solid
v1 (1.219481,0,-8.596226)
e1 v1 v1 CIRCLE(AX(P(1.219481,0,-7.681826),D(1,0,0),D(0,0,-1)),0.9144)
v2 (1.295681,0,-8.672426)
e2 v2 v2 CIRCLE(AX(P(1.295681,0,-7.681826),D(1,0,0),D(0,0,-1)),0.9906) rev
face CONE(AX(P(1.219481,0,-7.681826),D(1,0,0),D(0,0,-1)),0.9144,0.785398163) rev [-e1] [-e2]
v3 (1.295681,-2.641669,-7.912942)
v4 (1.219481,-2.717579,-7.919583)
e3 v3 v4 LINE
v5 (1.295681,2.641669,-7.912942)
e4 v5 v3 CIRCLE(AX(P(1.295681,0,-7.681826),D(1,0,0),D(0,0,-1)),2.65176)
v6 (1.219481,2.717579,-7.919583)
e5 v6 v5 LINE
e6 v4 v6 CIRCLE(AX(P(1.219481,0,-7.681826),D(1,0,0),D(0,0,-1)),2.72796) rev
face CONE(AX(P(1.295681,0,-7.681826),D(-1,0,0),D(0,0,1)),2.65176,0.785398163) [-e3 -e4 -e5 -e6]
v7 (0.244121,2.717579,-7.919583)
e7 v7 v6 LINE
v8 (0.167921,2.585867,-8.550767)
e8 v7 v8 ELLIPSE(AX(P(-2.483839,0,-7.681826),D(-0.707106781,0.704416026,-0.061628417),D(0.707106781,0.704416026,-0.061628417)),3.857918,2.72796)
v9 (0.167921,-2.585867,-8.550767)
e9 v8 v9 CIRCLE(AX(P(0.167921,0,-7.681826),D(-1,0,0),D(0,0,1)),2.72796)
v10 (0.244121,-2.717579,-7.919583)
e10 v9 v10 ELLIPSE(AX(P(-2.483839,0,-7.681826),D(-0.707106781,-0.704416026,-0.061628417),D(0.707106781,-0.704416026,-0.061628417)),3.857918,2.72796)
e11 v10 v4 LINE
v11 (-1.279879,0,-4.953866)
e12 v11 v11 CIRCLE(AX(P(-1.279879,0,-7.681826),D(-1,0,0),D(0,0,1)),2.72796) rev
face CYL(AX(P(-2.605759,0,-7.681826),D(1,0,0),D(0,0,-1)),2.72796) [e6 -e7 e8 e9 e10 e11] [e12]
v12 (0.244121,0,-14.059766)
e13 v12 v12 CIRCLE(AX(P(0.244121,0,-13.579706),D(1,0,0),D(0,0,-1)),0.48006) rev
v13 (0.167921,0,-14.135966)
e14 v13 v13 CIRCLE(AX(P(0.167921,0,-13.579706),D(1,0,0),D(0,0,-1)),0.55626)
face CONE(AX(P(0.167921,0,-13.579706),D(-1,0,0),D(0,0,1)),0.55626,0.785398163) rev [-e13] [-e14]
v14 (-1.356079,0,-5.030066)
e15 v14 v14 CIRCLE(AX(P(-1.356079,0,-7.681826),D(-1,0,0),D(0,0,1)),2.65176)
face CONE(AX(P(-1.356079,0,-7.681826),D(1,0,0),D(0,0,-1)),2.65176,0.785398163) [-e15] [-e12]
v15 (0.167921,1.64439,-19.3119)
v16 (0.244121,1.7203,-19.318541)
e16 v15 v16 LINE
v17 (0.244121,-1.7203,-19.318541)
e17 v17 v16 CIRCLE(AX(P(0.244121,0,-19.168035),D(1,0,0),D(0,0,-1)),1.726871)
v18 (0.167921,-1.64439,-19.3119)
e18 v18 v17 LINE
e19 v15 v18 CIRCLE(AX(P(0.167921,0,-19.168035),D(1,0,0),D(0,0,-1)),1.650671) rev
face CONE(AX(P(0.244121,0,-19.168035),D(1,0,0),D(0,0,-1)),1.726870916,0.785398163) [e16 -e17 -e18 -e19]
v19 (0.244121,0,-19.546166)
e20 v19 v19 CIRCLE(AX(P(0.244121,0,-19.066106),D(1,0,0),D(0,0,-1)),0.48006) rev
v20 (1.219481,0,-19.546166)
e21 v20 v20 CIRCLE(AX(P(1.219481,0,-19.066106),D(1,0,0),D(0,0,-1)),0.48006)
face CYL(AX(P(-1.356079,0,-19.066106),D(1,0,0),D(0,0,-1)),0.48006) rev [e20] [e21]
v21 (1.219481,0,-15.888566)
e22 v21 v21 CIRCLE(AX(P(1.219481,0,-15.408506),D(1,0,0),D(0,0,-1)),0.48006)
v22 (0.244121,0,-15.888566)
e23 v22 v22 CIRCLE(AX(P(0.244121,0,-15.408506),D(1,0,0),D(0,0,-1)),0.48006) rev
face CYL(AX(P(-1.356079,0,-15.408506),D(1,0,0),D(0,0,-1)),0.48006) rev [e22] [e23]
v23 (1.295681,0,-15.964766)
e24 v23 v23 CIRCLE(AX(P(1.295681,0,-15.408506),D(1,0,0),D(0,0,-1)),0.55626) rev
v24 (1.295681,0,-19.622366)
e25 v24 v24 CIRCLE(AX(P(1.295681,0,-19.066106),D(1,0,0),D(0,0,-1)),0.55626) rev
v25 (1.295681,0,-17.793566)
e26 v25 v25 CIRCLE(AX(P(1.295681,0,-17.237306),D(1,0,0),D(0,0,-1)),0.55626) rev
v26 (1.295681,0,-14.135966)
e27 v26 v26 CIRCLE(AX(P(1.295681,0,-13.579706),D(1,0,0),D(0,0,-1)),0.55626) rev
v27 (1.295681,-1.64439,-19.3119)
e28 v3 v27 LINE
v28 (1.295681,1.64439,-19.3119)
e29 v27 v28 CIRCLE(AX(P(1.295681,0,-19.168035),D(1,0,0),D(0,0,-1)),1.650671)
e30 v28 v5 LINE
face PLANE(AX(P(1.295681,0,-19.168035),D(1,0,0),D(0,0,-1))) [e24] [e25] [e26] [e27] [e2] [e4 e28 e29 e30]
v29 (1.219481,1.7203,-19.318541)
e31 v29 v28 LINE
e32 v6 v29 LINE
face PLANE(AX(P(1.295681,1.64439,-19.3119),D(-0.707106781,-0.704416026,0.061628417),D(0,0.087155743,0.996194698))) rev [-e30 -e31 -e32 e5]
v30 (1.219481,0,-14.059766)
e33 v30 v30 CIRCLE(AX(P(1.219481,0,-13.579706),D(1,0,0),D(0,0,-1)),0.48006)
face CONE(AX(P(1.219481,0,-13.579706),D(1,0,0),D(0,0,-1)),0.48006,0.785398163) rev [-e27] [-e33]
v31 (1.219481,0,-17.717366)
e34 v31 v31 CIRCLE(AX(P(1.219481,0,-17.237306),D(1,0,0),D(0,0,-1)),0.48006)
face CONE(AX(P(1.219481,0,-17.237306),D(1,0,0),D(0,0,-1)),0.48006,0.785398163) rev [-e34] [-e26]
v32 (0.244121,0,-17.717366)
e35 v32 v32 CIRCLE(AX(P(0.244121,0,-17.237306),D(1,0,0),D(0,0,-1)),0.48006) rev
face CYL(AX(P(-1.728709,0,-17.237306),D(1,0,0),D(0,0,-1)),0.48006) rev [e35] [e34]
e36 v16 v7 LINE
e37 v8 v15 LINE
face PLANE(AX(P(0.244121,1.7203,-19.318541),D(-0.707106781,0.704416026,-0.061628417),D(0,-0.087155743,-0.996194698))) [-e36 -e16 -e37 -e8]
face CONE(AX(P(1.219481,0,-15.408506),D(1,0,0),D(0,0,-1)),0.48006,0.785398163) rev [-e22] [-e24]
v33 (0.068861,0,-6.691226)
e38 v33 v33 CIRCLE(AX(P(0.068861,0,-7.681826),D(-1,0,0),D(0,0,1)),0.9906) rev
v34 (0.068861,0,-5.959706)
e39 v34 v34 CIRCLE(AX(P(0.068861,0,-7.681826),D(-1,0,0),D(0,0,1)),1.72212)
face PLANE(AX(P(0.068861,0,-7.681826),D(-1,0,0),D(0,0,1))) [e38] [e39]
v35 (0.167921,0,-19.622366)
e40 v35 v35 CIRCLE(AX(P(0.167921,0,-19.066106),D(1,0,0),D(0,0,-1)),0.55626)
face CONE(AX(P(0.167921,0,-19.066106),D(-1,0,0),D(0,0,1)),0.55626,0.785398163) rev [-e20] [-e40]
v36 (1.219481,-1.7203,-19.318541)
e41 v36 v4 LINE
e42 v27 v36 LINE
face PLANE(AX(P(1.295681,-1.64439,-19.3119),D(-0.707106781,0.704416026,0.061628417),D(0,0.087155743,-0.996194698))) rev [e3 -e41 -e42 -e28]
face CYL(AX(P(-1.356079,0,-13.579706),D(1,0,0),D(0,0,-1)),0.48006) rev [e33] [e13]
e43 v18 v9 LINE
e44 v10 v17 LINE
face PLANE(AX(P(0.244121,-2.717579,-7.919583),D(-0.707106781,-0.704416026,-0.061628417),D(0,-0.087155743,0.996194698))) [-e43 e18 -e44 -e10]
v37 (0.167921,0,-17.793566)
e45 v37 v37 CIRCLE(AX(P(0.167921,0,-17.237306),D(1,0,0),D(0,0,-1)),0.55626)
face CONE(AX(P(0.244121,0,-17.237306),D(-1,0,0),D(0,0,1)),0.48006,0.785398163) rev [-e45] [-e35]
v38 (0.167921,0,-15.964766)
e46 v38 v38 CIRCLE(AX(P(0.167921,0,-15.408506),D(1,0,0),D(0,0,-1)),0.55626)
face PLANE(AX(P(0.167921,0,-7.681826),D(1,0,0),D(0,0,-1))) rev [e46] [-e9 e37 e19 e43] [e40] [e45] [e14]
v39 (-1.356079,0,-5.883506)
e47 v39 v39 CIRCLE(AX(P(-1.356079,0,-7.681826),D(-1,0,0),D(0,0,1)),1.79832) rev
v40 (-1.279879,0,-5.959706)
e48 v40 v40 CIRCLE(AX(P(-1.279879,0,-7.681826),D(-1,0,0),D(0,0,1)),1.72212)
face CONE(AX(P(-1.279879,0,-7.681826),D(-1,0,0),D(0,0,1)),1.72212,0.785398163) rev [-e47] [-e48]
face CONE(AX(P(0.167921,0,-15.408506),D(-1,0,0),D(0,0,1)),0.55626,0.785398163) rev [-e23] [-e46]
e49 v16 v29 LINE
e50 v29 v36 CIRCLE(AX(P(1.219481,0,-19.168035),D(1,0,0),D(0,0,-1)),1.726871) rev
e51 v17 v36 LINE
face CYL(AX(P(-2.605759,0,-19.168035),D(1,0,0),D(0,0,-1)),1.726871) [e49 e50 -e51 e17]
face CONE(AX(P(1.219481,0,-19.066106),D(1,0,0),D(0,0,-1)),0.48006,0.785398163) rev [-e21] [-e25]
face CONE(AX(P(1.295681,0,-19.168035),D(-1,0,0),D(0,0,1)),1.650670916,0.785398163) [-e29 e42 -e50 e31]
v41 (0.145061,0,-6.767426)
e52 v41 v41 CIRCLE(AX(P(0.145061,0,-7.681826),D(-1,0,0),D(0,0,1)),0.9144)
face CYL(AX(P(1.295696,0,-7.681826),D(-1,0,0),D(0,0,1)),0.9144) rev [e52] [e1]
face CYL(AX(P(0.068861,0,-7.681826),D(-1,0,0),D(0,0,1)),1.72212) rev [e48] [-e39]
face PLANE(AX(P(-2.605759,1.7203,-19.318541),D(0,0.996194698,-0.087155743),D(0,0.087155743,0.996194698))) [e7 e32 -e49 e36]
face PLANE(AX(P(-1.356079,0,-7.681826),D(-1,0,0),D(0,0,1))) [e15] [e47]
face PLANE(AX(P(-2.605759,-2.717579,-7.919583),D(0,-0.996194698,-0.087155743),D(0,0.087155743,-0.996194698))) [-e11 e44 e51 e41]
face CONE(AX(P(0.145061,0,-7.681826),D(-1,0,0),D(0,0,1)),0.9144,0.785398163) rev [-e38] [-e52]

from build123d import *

# Parameters (mm, degrees)
BOSS_EXTRUDE1_DEPTH = 2.9972
CUT_EXTRUDE1_DEPTH  = 1.524
SKETCH6_R           = 1.1176
CUT_EXTRUDE3_DEPTH  = 29.630171982
CUT_EXTRUDE4_DEPTH  = 7.62
BOSS_EXTRUDE2_START = 0.4064
SKETCH9_R           = 1.1176
BOSS_EXTRUDE2_DEPTH = 0.4064
SKETCH10_R          = 1.1176
SKETCH10_R_2        = 0.8001
BOSS_EXTRUDE3_DEPTH = 1.8796
SKETCH11_R          = 4.5466
BOSS_EXTRUDE4_DEPTH = 2.54
SKETCH12_R          = 2.8702
CUT_EXTRUDE5_DEPTH  = 2.3749
SKETCH13_R          = 1.524
CUT_EXTRUDE6_DEPTH  = 28.807597626
SKETCH14_R          = 0.8001
CUT_EXTRUDE7_DEPTH  = 29.056286281
CHAMFER1_SIZE       = 0.127
CHAMFER2_SIZE       = 0.127
CHAMFER3_SIZE       = 0.127
SCALE1_SCALE        = 0.6


with BuildPart() as part:
    # Sketch1 → Boss-Extrude1 (new body)
    with BuildSketch(Plane(origin=(0, 0, 0), x_dir=(0, 0, -1), z_dir=(1, 0, 0))):
        with BuildLine():
            Line((24.769539012, 3.626266444), (5.771274976, 5.288399174))
            ThreePointArc((5.771274976, 5.288399174), (0, 0), (5.771274976, -5.288399174))
            Line((5.771274976, -5.288399174), (24.769539012, -3.626266444))
            ThreePointArc((24.769539012, -3.626266444), (28.0924, 0), (24.769539012, 3.626266444))
        make_face()
    extrude(amount=BOSS_EXTRUDE1_DEPTH)

    # Sketch4 → Cut-Extrude1 (cut)
    with BuildSketch(Plane(origin=(2.9972, 0, 0), x_dir=(0, 0, -1), z_dir=(1, 0, 0))):
        with BuildLine():
            Line((24.703126336, 2.867166085), (5.7048623, 4.529298814))
            ThreePointArc((5.7048623, 4.529298814), (0.762, 0), (5.7048623, -4.529298814))
            Line((5.7048623, -4.529298814), (24.703126336, -2.867166085))
            ThreePointArc((24.703126336, -2.867166085), (27.3304, 0), (24.703126336, 2.867166085))
        make_face()
    extrude(amount=-CUT_EXTRUDE1_DEPTH, mode=Mode.SUBTRACT)

    # Sketch6 → Cut-Extrude3 (cut, through all)
    with BuildSketch(Plane(origin=(1.4732, 0, 0), x_dir=(0, 0, -1), z_dir=(1, 0, 0))):
        with Locations((21.2344, 0)):
            Circle(SKETCH6_R)
    extrude(amount=-CUT_EXTRUDE3_DEPTH, mode=Mode.SUBTRACT)

    # Sketch7 → Cut-Extrude4 (cut)
    with BuildSketch(Plane(origin=(2.9972, 0, 0), x_dir=(0, 0, -1), z_dir=(1, 0, 0))):
        with BuildLine():
            Line((5.771274976, -5.288399174), (24.769539012, -3.626266444))
            ThreePointArc((24.769539012, -3.626266444), (28.0924, 0), (24.769539012, 3.626266444))
            Line((24.769539012, 3.626266444), (5.771274976, 5.288399174))
            ThreePointArc((5.771274976, 5.288399174), (0, 0), (5.771274976, -5.288399174))
        make_face()
        with BuildLine():
            Line((24.703126336, 2.867166085), (5.7048623, 4.529298814))
            ThreePointArc((5.7048623, 4.529298814), (0.762, 0), (5.7048623, -4.529298814))
            Line((5.7048623, -4.529298814), (24.703126336, -2.867166085))
            ThreePointArc((24.703126336, -2.867166085), (27.3304, 0), (24.703126336, 2.867166085))
        make_face(mode=Mode.SUBTRACT)
    extrude(amount=-CUT_EXTRUDE4_DEPTH, mode=Mode.SUBTRACT)

    # Sketch9 → Boss-Extrude2 (add)
    with BuildSketch(Plane(origin=(1.4732, 0, 0), x_dir=(0, 0, -1), z_dir=(1, 0, 0)).offset(BOSS_EXTRUDE2_START)):
        with BuildLine():
            Line((24.703126336, 2.867166085), (5.7048623, 4.529298814))
            ThreePointArc((5.7048623, 4.529298814), (0.762, 0), (5.7048623, -4.529298814))
            Line((5.7048623, -4.529298814), (24.703126336, -2.867166085))
            ThreePointArc((24.703126336, -2.867166085), (27.3304, 0), (24.703126336, 2.867166085))
        make_face()
        with Locations((21.2344, 0)):
            Circle(SKETCH9_R, mode=Mode.SUBTRACT)
    extrude(amount=-BOSS_EXTRUDE2_DEPTH)

    # Sketch10 → Boss-Extrude3 (add)
    with BuildSketch(Plane(origin=(1.8796, 0, 0), x_dir=(0, 0, -1), z_dir=(1, 0, 0))):
        with Locations((21.2344, 0)):
            Circle(SKETCH10_R)
        with Locations((21.2344, 0)):
            Circle(SKETCH10_R_2, mode=Mode.SUBTRACT)
    extrude(amount=-BOSS_EXTRUDE3_DEPTH)

    # Sketch11 → Boss-Extrude4 (add)
    with BuildSketch(Plane.ZY):
        with Locations(Location((-5.3086, 0, 0), (0, 0, 95))):
            Circle(SKETCH11_R)
    extrude(amount=BOSS_EXTRUDE4_DEPTH)

    # Sketch12 → Cut-Extrude5 (cut)
    with BuildSketch(Plane.ZY.offset(2.54)):
        with Locations((-5.3086, 0)):
            Circle(SKETCH12_R)
    extrude(amount=-CUT_EXTRUDE5_DEPTH, mode=Mode.SUBTRACT)

    # Sketch13 → Cut-Extrude6 (cut, through all)
    with BuildSketch(Plane.ZY.offset(0.1651)):
        with Locations((-5.3086, 0)):
            Circle(SKETCH13_R)
    extrude(amount=-CUT_EXTRUDE6_DEPTH, mode=Mode.SUBTRACT)

    # Sketch14 → Cut-Extrude7 (cut, through all)
    with BuildSketch(Plane(origin=(1.8796, 0, 0), x_dir=(0, 0, -1), z_dir=(1, 0, 0))):
        with Locations((18.1864, 0)):
            Circle(SKETCH14_R)
        with Locations((15.1384, 0)):
            Circle(SKETCH14_R)
        with Locations((24.2824, 0)):
            Circle(SKETCH14_R)
    extrude(amount=-CUT_EXTRUDE7_DEPTH, mode=Mode.SUBTRACT)

    # Chamfer1
    chamfer1_edges = [part.edges().sort_by_distance(p)[0] for p in [
        (-2.54, -4.529298814, -4.9123377),
        (-2.54, 0, -8.1788),
        (1.8796, 0, -6.8326),
        (-0.1651, 0, -6.8326),
    ]]
    chamfer(chamfer1_edges, length=CHAMFER1_SIZE)

    # Chamfer2
    chamfer2_edges = [part.edges().sort_by_distance(p)[0] for p in [
        (0, 0, -17.3863),
        (1.8796, 0, -17.3863),
        (0, 0, -14.3383),
        (1.8796, 0, -14.3383),
        (0, 0, -23.4823),
        (1.8796, 0, -23.4823),
        (1.8796, 0, -27.3304),
        (1.8796, 3.698232449, -15.203994318),
        (1.8796, 0, -0.762),
        (1.8796, -3.698232449, -15.203994318),
        (0, 0, -20.4343),
        (1.8796, 0, -20.4343),
    ]]
    chamfer(chamfer2_edges, length=CHAMFER2_SIZE)

    # Chamfer3
    # the kernel refuses this chamfer: 0.127 mm, written as the material it takes off along each edge
    with BuildSketch(Plane(origin=(0, -4.557764206, -5.379501386), x_dir=(0.9996219169112968, -0.027391246498850615, -0.002396423548493402), z_dir=(0, 0.08715574274765155, -0.9961946980917461))) as chamfer3_piece_1_section:
        Polygon((CHAMFER3_SIZE * 0.999621916911, -CHAMFER3_SIZE * 0.0274958766106), (-CHAMFER3_SIZE * 0.0274958766106, -CHAMFER3_SIZE * 0.999621916911), (0, 0), align=None)
    chamfer3_piece_1 = extrude(amount=19.397438057, mode=Mode.PRIVATE)
    chamfer3_piece_1 = chamfer3_piece_1 - Plane(origin=(0.042171089, 0, -5.3086), x_dir=(0, 0.9961946980917455, -0.08715574274765824), z_dir=(1, 0, 0)) * Cylinder(4.5466, 40, mode=Mode.PRIVATE)
    add(chamfer3_piece_1, mode=Mode.SUBTRACT)
    with BuildSketch(Plane(origin=(0, 2.867166085, -24.703126336), x_dir=(-0.027495876610586393, -0.9958180537233419, 0.08712279063523509), z_dir=(0, 0.08715574274765134, 0.9961946980917462))) as chamfer3_piece_2_section:
        Polygon((CHAMFER3_SIZE * 0.999621916911, CHAMFER3_SIZE * 0.0274958766106), (-CHAMFER3_SIZE * 0.0274958766106, CHAMFER3_SIZE * 0.999621916911), (0, 0), align=None)
    chamfer3_piece_2 = extrude(amount=19.397438057, mode=Mode.PRIVATE)
    chamfer3_piece_2 = chamfer3_piece_2 - Plane(origin=(0.042171094, 0, -5.3086), x_dir=(0, 0.9961946980917455, -0.08715574274765824), z_dir=(1, 0, 0)) * Cylinder(4.5466, 40, mode=Mode.PRIVATE)
    add(chamfer3_piece_2, mode=Mode.SUBTRACT)
    with BuildSketch(Plane(origin=(0, 0, -24.452281807), x_dir=(0, -0.996194698091746, -0.08715574274765267), z_dir=(0, -0.08715574274765267, 0.996194698091746))) as chamfer3_piece_3:
        Polygon((2.878118193 - CHAMFER3_SIZE, 0), (2.878118193, CHAMFER3_SIZE), (2.878118193, 0), align=None)
    revolve(axis=Axis((0, 0, -24.452281807), (1, 0, 0)), revolution_arc=170, mode=Mode.SUBTRACT)


with BuildPart() as part_1:
    # Scale1: scaled about (0.419801812, 0, -11.241664116)
    add(part.part.scale(SCALE1_SCALE).moved(Location((0.167920725, 0, -4.496665646))))


solid = part_1.part
